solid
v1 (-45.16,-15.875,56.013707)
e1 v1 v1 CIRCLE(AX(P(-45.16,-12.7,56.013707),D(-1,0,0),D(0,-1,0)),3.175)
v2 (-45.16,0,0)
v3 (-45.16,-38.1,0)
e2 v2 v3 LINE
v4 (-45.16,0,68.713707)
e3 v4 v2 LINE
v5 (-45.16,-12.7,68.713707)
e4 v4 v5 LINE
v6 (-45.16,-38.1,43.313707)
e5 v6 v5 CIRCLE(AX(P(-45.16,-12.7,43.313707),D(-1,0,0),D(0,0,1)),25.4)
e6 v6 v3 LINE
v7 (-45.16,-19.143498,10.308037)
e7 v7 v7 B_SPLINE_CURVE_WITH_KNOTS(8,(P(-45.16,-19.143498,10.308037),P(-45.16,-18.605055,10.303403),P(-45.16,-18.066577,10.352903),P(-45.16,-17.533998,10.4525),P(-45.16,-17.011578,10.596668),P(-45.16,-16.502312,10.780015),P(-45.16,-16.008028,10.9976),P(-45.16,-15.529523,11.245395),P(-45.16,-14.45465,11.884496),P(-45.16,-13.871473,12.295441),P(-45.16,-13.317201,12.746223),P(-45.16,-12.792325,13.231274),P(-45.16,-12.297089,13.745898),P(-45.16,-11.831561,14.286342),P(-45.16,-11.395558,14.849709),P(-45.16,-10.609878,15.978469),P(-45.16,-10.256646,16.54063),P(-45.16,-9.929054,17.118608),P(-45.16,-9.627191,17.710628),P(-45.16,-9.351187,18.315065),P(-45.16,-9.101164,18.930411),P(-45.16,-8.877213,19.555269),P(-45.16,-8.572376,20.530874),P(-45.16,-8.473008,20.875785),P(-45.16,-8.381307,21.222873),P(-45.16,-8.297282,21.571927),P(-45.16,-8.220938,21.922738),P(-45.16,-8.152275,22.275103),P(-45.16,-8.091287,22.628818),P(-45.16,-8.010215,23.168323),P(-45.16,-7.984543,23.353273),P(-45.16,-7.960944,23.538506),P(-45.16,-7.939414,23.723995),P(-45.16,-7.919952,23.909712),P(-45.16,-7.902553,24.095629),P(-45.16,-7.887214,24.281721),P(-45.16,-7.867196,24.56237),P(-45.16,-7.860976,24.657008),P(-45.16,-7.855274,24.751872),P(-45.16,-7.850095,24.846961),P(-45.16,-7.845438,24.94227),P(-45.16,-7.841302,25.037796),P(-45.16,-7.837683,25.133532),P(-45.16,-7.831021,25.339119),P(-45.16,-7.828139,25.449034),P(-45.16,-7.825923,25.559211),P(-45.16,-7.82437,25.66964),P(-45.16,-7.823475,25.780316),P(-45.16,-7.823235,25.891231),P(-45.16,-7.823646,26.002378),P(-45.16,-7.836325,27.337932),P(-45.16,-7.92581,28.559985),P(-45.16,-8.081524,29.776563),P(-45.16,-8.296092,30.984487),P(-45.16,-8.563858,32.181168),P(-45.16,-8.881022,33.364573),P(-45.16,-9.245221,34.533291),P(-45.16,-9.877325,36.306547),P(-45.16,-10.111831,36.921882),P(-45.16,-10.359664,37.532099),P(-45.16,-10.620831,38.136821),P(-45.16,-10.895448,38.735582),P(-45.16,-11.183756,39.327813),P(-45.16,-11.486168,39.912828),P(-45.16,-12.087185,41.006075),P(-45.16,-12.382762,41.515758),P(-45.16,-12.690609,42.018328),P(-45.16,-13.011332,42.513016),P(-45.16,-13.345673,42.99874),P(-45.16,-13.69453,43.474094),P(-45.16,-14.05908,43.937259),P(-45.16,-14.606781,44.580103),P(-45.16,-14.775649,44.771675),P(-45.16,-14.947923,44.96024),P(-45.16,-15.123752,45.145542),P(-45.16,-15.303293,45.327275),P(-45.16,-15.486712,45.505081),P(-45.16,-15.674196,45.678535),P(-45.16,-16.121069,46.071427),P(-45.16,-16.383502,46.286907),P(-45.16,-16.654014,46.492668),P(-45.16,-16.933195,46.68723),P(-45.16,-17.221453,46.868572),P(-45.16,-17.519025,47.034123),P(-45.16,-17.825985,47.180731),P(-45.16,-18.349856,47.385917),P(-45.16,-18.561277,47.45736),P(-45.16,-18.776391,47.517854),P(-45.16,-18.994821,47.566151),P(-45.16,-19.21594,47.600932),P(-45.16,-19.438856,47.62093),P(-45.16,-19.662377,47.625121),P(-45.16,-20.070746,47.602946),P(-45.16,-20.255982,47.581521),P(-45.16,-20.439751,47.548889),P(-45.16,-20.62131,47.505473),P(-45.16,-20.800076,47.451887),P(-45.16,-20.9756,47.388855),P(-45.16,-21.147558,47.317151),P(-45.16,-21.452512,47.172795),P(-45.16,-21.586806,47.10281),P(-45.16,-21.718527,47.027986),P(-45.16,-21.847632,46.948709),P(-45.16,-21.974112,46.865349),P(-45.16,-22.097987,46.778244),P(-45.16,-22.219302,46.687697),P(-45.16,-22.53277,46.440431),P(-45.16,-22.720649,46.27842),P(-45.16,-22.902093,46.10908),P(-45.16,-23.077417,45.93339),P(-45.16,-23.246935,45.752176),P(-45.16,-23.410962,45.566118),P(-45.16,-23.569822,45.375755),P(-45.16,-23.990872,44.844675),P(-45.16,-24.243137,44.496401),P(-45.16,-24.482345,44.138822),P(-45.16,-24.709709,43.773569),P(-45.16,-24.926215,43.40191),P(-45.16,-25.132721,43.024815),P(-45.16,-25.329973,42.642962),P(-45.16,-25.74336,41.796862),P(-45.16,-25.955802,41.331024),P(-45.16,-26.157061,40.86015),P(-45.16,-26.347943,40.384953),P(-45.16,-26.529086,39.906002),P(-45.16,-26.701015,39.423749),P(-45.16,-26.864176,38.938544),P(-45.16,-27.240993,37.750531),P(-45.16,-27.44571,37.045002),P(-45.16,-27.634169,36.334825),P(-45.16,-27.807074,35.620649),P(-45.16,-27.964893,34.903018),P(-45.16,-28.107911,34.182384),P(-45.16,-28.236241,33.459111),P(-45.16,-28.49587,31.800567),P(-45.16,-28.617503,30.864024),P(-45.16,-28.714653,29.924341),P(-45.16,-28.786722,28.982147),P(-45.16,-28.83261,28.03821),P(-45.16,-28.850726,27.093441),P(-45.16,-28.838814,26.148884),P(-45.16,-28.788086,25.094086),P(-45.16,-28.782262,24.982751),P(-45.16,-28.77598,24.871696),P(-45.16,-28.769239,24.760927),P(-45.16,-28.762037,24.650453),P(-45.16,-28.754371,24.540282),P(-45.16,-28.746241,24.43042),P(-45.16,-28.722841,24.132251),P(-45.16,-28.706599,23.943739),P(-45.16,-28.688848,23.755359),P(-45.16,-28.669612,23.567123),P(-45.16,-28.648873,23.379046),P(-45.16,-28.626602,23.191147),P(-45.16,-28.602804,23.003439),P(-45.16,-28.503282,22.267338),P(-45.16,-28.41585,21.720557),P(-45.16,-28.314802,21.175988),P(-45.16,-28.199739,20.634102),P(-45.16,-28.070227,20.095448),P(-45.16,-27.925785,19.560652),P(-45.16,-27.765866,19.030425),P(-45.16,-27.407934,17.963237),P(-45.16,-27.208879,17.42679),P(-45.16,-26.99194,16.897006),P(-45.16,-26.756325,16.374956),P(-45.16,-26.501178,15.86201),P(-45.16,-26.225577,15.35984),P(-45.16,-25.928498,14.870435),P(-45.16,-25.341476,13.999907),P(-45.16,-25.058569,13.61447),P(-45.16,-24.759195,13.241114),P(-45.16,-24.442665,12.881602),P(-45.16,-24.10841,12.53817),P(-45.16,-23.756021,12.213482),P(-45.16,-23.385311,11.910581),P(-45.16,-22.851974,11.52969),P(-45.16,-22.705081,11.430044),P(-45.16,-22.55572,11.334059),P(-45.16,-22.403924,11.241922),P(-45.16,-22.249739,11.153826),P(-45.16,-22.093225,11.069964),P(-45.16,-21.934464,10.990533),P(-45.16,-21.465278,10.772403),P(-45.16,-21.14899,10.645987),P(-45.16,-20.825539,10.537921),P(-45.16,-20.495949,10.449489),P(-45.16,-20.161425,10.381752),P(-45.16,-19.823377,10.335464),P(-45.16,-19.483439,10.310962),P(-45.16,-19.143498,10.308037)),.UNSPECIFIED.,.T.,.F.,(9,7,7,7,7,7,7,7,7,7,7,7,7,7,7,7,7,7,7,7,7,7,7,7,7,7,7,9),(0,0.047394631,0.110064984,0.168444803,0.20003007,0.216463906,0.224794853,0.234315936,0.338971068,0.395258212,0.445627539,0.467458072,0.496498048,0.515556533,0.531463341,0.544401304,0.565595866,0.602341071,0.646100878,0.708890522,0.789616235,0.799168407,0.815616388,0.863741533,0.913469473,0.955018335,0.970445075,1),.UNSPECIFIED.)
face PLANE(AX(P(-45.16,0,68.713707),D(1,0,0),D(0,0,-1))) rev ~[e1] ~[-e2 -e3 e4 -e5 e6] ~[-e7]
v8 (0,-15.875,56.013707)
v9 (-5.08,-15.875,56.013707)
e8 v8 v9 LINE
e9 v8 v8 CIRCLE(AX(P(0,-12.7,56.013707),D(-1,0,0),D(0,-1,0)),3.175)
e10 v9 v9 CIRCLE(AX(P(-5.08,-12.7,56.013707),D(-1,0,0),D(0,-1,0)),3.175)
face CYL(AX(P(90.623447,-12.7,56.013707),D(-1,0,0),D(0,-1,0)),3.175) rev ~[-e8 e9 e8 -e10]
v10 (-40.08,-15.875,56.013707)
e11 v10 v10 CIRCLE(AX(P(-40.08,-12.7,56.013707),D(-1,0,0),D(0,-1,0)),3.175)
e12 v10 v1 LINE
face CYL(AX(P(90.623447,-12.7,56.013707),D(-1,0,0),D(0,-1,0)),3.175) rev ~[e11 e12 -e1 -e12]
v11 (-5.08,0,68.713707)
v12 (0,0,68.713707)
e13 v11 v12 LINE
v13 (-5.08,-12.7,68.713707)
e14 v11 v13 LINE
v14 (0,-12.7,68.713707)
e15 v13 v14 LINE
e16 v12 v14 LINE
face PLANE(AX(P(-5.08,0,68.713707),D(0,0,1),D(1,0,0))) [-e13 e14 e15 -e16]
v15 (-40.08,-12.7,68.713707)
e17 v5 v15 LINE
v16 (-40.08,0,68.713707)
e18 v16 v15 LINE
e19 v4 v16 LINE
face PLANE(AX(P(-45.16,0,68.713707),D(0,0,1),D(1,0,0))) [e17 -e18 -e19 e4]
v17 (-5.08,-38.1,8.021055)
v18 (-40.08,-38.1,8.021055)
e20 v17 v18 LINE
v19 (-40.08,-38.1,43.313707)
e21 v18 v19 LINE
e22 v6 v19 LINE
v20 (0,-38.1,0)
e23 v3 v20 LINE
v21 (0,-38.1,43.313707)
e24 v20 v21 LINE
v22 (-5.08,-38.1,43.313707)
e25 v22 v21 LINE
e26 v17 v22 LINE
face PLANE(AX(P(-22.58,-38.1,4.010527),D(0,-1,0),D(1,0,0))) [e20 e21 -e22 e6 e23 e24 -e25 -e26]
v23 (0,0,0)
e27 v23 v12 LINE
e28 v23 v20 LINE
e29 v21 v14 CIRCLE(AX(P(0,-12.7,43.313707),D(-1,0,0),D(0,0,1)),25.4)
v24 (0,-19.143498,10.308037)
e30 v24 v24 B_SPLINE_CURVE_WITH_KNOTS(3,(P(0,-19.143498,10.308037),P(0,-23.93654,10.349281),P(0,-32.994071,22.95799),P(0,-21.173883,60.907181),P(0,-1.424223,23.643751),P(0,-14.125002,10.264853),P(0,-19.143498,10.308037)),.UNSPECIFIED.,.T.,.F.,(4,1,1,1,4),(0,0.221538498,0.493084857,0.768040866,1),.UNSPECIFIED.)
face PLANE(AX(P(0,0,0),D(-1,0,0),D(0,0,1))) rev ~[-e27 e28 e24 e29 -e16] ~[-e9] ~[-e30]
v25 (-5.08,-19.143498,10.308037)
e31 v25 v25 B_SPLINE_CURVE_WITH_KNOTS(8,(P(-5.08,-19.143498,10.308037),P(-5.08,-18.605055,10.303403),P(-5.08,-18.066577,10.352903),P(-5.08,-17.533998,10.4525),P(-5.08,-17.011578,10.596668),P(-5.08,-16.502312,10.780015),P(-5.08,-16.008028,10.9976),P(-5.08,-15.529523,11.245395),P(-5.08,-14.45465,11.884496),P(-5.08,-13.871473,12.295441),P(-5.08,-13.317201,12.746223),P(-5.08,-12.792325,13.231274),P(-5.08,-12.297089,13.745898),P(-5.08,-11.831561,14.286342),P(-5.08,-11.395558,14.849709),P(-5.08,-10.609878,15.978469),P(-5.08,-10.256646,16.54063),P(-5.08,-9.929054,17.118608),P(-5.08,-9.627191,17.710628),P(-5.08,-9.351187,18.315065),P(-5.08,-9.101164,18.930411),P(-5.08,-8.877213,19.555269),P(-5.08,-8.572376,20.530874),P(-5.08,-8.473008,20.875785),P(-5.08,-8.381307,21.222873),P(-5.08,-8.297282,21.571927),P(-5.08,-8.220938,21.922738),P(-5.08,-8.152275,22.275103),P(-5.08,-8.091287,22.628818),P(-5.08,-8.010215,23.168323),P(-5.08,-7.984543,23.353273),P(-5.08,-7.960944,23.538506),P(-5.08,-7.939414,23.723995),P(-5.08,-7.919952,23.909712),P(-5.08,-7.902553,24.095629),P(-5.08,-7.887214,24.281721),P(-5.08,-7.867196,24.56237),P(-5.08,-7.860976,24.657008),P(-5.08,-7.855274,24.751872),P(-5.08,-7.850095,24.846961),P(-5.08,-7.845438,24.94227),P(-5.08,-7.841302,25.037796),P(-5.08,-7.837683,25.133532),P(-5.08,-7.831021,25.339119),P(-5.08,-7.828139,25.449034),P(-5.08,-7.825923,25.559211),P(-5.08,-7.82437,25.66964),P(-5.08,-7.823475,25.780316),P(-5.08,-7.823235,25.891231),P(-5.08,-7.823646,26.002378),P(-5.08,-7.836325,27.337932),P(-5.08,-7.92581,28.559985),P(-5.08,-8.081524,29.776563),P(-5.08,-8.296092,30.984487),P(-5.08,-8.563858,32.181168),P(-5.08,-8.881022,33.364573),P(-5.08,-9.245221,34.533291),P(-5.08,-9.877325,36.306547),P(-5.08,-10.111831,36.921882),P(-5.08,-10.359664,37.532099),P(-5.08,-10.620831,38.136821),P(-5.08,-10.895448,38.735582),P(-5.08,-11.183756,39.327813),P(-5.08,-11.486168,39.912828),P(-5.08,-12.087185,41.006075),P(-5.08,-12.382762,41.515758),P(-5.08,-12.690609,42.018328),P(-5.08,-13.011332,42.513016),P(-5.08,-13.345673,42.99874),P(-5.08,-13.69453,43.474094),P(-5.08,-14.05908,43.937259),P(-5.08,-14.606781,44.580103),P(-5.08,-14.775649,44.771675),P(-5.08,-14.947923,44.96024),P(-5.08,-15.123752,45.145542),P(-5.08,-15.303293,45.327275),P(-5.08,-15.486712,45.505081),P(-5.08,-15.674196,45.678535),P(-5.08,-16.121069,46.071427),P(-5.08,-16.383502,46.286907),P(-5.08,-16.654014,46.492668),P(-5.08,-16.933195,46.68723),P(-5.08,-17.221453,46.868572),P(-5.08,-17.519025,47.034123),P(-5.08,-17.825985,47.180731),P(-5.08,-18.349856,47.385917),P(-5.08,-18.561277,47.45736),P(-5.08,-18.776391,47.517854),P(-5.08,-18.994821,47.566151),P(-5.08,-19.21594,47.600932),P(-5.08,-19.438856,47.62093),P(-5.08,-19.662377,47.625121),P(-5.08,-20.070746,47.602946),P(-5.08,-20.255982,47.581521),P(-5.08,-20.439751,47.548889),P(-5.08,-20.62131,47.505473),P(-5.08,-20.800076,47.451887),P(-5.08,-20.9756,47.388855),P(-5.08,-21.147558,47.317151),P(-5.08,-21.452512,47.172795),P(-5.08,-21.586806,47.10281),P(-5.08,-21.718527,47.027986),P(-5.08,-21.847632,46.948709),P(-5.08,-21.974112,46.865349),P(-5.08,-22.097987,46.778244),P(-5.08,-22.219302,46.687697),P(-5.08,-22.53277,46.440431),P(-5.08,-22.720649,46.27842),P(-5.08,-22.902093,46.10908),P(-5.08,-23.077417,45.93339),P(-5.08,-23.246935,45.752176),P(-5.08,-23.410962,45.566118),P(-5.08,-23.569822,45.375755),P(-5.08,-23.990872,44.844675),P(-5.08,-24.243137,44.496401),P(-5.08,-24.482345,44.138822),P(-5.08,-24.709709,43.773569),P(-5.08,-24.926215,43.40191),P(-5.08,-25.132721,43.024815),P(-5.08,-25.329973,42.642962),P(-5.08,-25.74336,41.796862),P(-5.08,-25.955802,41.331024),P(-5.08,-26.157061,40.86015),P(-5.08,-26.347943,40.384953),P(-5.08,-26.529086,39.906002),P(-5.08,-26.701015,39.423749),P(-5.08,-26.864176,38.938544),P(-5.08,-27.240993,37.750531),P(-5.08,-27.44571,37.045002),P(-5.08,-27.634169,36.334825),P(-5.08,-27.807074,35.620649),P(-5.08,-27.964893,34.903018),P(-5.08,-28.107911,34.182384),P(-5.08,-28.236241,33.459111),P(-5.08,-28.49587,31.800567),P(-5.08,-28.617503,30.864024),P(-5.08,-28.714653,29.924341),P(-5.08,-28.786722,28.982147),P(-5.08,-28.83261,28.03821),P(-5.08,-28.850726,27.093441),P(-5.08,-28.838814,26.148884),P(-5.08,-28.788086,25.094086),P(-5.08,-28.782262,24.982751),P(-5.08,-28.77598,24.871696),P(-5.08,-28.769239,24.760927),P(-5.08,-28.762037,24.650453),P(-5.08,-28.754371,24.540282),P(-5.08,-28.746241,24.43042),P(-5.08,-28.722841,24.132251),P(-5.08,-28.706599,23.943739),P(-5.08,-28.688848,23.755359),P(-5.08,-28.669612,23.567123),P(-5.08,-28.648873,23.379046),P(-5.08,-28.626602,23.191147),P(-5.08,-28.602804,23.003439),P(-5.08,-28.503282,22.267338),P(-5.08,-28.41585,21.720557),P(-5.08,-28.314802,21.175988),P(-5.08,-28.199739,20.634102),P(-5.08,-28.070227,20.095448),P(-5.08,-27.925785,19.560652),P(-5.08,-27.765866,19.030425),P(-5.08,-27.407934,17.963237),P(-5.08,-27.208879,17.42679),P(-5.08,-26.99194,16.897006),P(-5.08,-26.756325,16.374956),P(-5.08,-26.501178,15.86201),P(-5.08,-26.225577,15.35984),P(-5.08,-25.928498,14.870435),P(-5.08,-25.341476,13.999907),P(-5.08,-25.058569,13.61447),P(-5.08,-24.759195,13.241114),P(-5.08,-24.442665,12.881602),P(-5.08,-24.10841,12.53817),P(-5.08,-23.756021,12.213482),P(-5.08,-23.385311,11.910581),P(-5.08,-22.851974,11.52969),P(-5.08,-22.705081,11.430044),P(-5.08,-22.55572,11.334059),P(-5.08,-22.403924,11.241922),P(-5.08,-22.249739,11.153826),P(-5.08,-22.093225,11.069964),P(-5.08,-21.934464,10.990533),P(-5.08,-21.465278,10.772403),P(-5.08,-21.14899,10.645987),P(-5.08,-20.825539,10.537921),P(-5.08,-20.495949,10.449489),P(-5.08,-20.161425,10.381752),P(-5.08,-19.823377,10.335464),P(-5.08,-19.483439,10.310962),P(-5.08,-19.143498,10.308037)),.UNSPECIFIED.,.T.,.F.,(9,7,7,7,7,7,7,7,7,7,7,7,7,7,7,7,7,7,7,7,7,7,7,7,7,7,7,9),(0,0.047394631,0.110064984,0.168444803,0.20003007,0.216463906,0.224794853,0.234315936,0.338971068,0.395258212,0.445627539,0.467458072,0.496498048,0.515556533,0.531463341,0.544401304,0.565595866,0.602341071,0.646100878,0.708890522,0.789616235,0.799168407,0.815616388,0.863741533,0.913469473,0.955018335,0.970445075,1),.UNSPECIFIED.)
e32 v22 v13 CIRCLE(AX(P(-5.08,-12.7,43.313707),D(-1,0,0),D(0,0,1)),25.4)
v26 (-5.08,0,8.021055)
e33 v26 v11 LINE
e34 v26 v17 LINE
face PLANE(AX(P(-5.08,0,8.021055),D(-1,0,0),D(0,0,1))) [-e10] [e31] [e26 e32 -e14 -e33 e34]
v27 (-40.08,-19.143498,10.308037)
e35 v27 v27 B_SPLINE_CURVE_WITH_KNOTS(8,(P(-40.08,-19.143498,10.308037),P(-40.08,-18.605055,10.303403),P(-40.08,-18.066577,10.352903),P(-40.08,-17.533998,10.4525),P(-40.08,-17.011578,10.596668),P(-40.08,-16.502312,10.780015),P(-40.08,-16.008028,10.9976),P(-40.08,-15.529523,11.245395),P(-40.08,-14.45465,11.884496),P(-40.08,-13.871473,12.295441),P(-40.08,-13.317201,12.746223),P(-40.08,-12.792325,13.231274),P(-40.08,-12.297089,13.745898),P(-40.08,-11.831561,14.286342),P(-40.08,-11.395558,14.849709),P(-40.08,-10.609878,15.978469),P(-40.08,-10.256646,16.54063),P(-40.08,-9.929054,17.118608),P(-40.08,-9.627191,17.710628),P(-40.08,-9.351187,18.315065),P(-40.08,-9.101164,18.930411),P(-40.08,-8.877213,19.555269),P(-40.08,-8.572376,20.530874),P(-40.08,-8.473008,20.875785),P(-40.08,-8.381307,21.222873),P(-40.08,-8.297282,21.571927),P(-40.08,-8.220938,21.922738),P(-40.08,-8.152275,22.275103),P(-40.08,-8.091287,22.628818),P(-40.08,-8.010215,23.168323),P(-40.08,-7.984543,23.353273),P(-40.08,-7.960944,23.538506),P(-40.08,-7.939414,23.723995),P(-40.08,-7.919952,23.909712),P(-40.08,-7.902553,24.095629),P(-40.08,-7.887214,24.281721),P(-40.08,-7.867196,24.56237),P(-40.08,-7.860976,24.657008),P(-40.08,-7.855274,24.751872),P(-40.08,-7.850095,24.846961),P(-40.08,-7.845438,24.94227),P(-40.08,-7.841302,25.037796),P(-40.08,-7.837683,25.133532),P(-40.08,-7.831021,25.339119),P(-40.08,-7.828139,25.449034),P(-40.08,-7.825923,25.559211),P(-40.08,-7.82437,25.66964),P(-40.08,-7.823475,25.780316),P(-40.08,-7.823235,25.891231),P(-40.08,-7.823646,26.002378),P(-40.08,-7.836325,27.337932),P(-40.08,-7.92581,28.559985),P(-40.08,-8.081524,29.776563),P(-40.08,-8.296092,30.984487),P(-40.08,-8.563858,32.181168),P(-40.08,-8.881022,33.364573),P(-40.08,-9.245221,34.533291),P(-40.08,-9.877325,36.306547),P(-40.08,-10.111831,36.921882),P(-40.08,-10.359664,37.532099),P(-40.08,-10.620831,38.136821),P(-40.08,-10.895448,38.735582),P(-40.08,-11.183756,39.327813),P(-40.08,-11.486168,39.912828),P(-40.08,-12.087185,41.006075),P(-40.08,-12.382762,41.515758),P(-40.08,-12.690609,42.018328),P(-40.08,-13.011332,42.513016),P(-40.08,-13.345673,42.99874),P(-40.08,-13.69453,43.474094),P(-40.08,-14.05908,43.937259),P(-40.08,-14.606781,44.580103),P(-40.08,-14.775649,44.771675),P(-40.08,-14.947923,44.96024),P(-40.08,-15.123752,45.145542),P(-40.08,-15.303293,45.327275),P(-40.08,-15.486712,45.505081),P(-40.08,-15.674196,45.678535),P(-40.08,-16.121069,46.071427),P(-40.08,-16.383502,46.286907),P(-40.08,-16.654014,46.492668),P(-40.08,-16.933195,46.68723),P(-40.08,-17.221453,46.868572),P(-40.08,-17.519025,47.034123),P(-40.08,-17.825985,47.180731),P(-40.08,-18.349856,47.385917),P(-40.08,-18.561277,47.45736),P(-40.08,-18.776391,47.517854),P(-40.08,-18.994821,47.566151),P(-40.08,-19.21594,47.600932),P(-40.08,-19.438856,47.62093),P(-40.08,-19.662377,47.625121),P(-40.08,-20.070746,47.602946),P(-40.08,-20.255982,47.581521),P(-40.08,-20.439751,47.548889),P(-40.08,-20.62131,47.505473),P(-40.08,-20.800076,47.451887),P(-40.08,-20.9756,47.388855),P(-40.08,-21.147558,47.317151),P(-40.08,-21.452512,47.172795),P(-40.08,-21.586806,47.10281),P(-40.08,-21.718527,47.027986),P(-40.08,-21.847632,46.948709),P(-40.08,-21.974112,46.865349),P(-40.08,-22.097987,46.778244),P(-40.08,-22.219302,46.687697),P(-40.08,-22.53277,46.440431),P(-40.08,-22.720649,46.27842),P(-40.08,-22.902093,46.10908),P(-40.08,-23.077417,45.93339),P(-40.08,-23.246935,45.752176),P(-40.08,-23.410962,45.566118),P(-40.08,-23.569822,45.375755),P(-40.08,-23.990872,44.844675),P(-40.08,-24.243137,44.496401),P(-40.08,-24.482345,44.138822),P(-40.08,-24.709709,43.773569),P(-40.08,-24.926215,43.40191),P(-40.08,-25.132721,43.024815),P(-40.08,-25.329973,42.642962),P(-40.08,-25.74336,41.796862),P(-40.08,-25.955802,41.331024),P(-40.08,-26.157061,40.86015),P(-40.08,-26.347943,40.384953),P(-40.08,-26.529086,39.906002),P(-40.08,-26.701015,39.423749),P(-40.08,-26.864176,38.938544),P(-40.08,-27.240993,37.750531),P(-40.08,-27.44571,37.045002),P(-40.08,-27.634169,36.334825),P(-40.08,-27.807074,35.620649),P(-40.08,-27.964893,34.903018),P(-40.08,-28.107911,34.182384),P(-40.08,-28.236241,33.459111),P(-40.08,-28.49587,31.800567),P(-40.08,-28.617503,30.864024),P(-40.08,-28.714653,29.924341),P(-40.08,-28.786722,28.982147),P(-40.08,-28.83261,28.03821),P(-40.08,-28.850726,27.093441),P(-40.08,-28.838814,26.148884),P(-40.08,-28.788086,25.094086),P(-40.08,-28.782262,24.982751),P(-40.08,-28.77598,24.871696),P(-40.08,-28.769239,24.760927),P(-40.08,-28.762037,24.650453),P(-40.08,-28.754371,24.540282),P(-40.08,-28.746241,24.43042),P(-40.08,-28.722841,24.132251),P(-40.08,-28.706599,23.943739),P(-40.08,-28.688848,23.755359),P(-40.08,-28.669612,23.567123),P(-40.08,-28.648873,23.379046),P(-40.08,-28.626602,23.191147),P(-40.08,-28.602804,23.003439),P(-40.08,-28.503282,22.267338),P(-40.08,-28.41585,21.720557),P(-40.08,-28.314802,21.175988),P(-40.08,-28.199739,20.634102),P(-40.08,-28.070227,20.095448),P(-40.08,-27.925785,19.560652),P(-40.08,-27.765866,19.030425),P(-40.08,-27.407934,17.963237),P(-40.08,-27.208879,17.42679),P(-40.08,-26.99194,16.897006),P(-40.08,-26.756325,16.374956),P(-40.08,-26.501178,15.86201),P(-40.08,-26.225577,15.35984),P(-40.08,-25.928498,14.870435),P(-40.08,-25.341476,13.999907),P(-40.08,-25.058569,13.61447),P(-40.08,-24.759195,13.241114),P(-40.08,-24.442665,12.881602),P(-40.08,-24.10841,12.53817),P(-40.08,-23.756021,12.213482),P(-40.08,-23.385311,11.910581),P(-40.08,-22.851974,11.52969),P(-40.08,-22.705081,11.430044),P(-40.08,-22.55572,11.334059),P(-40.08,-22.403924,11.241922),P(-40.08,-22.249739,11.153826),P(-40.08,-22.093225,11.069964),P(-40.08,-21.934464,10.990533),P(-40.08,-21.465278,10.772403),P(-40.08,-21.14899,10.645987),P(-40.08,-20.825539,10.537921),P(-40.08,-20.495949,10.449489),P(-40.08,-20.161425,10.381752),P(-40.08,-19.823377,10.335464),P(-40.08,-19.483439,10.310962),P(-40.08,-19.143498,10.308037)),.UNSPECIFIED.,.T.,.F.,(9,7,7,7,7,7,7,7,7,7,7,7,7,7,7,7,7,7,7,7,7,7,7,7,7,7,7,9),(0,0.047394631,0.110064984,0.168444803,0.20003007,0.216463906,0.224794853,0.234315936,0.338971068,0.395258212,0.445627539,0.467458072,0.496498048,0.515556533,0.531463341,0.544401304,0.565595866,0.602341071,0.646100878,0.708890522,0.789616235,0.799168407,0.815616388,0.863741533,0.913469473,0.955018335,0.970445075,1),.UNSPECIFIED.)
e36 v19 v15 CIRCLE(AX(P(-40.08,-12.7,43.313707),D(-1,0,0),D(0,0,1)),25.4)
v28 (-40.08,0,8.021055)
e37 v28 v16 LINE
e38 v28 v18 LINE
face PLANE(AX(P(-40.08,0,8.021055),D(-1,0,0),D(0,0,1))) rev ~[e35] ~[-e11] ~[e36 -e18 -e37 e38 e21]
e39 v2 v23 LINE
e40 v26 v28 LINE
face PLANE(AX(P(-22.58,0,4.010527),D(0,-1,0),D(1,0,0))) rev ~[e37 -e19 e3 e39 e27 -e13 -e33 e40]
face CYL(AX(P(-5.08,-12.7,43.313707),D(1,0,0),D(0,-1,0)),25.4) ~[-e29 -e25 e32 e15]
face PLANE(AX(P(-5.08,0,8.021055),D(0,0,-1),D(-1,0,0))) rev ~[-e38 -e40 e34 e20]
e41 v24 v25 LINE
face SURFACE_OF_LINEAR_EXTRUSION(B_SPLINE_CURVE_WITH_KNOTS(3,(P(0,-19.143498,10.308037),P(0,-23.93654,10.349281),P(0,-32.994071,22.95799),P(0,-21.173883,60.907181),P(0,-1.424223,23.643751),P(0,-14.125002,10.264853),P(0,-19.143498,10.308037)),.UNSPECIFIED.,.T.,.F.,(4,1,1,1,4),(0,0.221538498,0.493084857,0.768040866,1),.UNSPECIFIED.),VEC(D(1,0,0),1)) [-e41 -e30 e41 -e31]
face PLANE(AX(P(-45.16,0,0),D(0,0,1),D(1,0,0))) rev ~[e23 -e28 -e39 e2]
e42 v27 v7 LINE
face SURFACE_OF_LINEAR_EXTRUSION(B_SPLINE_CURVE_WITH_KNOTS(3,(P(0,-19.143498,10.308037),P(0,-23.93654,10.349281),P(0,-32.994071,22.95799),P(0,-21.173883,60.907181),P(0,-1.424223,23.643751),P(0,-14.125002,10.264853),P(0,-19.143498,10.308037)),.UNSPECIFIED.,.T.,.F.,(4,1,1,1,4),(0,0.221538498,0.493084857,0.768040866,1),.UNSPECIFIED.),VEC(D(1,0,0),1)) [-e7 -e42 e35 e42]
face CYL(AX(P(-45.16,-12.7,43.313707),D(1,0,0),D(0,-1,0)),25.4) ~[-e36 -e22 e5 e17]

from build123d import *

# Parameters (mm, degrees)
F0_W     = 5.08
F0_H     = 60.6926516568
F1_DEPTH = 38.1
F3_D     = 6.35
F4_DEPTH = 45.161
F5_R     = 25.4


# Not quite as in the source:
# - a feature names something its author has since deleted; it is built from what else it names


with BuildPart() as f1:
    # F0 (on Front) → F1 (new body)
    with BuildSketch(Plane.XZ):
        Polygon((-45.16, 0), (0, 0), (0, 8.0210549811), (-5.08, 8.0210549811), (-40.08, 8.0210549811), (-45.16, 8.0210549811), align=None)
        with Locations((-2.54, 38.3673808095)):
            Rectangle(F0_W, F0_H)
        with Locations((-42.62, 38.3673808095)):
            Rectangle(F0_W, F0_H)
    extrude(amount=F1_DEPTH)

    # F3 (through all)
    with Locations(Plane.YZ):
        with Locations((-12.7, 56.0137066379)):
            Hole(F3_D / 2)

    # F2 (on Right) → F4 (cut, through all)
    with BuildSketch(Plane.YZ):
        with BuildLine():
            add(Edge.make_bspline(
                [(-19.1434975713, 10.3080365807), (-23.9365403388, 10.3492805031), (-32.9940706123, 22.9579895891), (-21.1738830705, 60.90718063), (-1.4242230003, 23.6437509657), (-14.1250016542, 10.2648526438), (-19.1434975713, 10.3080365807)],
                knots=[0, 0, 0, 0, 0.2215384982, 0.4930848573, 0.7680408662, 1, 1, 1, 1], degree=3))
        make_face()
    extrude(amount=-F4_DEPTH, mode=Mode.SUBTRACT)

    # F5
    f5_edges = [f1.edges().sort_by_distance(p)[0] for p in [
        (-2.54, -38.1, 68.713707),
        (-42.62, -38.1, 68.713707),
    ]]
    fillet(f5_edges, radius=F5_R)


solid = f1.part
